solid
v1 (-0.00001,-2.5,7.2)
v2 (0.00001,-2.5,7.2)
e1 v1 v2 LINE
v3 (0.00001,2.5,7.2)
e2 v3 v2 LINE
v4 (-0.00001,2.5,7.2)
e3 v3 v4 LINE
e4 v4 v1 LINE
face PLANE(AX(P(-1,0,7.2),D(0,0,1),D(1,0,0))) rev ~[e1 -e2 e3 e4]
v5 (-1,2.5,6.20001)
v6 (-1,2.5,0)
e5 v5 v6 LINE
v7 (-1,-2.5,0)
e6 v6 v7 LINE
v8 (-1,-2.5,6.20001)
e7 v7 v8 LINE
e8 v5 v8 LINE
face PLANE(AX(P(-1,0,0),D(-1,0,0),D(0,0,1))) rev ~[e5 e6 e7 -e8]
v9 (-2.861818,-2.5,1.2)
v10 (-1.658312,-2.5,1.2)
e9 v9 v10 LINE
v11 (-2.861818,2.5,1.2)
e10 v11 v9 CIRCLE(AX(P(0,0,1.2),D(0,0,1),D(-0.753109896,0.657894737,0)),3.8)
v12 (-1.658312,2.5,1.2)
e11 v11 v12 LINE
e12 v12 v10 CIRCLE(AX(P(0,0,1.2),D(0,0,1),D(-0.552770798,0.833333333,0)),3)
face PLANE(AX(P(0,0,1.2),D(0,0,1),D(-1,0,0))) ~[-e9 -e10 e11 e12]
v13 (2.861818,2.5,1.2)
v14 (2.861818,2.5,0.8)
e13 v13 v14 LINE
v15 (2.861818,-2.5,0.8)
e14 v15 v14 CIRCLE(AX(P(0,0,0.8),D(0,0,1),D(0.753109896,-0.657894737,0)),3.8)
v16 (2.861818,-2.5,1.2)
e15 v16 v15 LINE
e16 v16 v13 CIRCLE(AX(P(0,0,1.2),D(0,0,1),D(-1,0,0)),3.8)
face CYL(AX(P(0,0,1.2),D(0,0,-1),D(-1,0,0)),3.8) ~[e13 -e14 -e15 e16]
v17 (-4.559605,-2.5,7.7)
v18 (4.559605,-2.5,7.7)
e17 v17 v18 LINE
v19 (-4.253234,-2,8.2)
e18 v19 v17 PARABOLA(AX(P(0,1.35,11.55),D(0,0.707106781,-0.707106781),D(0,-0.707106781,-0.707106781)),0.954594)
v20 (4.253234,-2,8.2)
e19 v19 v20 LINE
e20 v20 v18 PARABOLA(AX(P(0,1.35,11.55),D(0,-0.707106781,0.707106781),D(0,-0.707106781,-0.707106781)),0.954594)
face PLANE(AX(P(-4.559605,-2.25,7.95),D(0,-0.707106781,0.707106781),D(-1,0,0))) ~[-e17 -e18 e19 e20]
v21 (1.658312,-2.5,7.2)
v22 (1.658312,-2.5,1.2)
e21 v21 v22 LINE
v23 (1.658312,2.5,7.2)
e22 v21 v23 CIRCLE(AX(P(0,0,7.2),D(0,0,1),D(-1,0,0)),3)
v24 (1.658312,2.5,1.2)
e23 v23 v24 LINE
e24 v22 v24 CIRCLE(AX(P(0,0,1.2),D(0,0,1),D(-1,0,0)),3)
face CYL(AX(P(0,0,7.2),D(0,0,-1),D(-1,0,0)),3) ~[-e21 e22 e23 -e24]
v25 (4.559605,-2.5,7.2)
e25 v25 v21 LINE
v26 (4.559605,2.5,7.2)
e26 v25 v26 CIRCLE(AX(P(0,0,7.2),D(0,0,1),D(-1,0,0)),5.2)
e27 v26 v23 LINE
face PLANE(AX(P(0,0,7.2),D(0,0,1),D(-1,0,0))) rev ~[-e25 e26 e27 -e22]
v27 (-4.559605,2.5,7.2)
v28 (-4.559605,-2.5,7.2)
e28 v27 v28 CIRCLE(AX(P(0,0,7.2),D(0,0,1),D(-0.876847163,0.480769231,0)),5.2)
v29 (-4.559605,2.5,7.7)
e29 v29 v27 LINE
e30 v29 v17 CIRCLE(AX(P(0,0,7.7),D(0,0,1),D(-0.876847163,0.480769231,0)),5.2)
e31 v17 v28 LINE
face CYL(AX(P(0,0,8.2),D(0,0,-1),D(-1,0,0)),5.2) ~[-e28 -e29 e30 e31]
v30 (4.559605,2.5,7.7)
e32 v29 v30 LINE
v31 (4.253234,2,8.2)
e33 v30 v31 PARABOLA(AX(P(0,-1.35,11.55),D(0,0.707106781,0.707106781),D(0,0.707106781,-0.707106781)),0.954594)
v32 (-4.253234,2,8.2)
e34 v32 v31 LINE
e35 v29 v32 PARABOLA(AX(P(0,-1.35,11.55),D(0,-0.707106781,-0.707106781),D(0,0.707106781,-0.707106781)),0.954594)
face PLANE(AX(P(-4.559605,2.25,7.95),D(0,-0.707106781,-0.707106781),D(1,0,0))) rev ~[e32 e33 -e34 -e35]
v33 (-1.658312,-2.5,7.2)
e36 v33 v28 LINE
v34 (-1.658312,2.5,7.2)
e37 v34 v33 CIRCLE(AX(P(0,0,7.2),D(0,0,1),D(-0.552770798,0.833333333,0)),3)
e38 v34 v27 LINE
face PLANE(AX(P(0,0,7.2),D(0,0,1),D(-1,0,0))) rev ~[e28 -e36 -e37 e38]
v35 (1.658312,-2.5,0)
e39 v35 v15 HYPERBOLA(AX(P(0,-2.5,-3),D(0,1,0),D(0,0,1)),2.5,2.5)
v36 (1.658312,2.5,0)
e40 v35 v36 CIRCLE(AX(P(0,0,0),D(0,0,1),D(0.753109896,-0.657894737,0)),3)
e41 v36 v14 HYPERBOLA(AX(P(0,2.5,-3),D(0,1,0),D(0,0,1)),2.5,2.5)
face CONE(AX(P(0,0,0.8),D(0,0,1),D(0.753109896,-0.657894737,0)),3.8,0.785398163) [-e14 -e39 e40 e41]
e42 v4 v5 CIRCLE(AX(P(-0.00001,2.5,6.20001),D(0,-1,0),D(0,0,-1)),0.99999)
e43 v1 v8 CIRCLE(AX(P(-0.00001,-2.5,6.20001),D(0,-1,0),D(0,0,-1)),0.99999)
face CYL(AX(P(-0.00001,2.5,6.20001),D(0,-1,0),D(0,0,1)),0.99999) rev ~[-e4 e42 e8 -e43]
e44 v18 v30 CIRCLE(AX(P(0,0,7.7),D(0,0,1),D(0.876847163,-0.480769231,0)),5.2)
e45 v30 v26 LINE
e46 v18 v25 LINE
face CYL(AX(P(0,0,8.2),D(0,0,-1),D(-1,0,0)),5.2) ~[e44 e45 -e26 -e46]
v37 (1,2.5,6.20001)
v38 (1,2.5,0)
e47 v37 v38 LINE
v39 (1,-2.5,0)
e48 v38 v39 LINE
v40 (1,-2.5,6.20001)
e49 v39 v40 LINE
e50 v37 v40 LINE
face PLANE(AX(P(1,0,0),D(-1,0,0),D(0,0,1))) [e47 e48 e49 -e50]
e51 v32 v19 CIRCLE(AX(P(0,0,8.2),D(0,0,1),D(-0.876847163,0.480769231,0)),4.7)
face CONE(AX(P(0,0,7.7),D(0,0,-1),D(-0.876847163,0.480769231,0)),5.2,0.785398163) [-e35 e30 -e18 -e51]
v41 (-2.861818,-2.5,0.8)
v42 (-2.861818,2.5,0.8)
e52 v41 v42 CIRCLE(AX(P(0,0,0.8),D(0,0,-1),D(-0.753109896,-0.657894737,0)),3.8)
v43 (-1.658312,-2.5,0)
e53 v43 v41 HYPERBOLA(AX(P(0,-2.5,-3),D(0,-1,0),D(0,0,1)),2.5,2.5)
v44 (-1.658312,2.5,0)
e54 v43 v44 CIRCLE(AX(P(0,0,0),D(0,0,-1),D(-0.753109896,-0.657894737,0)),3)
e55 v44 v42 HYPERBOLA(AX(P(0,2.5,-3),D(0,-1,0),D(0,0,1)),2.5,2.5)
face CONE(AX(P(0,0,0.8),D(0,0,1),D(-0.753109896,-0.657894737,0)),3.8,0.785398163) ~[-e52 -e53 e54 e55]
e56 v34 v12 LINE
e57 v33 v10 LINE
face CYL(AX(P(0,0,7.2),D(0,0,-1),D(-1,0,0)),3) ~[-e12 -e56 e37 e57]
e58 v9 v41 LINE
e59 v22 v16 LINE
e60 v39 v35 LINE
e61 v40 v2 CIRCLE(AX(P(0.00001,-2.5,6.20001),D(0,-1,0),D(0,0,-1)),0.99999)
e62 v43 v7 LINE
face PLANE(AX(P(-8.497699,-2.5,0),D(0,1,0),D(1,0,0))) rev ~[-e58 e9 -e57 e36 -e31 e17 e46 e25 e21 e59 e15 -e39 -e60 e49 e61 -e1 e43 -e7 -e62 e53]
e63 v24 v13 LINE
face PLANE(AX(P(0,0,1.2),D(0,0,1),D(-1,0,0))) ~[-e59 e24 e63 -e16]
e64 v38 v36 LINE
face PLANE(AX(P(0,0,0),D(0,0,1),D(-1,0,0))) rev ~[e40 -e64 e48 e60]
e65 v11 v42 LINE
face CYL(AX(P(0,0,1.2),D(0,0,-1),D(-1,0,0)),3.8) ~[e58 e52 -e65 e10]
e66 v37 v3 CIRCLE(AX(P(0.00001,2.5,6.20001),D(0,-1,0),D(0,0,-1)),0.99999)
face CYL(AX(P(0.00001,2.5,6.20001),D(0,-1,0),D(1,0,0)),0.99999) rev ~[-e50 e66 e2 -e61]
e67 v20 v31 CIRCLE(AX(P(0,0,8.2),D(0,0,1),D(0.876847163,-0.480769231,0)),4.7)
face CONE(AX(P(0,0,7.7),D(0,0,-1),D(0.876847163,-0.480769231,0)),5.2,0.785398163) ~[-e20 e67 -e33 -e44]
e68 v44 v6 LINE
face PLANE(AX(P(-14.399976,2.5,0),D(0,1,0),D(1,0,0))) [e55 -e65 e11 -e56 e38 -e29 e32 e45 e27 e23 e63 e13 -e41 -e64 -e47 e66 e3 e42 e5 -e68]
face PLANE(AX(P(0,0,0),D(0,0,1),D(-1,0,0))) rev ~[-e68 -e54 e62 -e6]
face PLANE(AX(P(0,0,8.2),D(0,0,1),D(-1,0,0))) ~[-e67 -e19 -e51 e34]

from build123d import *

# Parameters (mm, degrees)
F2_W          = 32.7764776534
F2_H          = 9.1045777517
F2_W_2        = 20.9091340361
F2_H_2        = 3.5162510286
F3_DEPTH      = 25
F4_W          = 2
F4_H          = 7.2
F5_DEPTH      = 25
F5_DEPTH_BACK = 25
F6_R          = 0.99999
F7_SIZE       = 0.8
F8_SIZE       = 0.5


# Not quite as in the source:
# - a fillet or chamfer is up to 0.001 mm smaller than in the source, because OpenCascade refuses the exact size


with BuildPart() as f1:
    # F0 (on Front) → F1 (revolve)
    with BuildSketch(Plane.XZ):
        Polygon((0, 0), (0, 8.2), (-5.2, 8.2), (-5.2, 7.2), (-3, 7.2), (-3, 1.2), (-3.8, 1.2), (-3.8, 0), align=None)
    revolve(axis=Axis((0, 0, 4.1), (0, 0, 1)))

    # F2 (on Top) → F3 (cut)
    with BuildSketch(Plane.XY):
        with Locations((1.9882628694, 7.0522888758)):
            Rectangle(F2_W, F2_H)
        with Locations((1.9568684145, -4.2581255143)):
            Rectangle(F2_W_2, F2_H_2)
    extrude(amount=F3_DEPTH, mode=Mode.SUBTRACT)

    # F4 (on Front) → F5 (cut, two sides)
    with BuildSketch(Plane.XZ) as f5_sk:
        with Locations((0, 3.6)):
            Rectangle(F4_W, F4_H)
    extrude(amount=-F5_DEPTH, mode=Mode.SUBTRACT)
    extrude(f5_sk.sketch, amount=F5_DEPTH_BACK, mode=Mode.SUBTRACT)

    # F6 (radius 1 in the source; OpenCascade refuses exactly that, so slightly less here)
    f6_edges = [f1.edges().sort_by_distance(p)[0] for p in [
        (-1, 0, 7.2),
        (1, 0, 7.2),
    ]]
    fillet(f6_edges, radius=F6_R)

    # F7
    f7_edges = [f1.edges().sort_by_distance(p)[0] for p in [
        (3.8, 0, 0),
        (-3.8, 0, 0),
    ]]
    chamfer(f7_edges, length=F7_SIZE)

    # F8
    f8_edges = [f1.edges().sort_by_distance(p)[0] for p in [
        (0, -2.5, 8.2),
        (-5.2, 0, 8.2),
        (0, 2.5, 8.2),
        (5.2, 0, 8.2),
    ]]
    chamfer(f8_edges, length=F8_SIZE)


solid = f1.part
